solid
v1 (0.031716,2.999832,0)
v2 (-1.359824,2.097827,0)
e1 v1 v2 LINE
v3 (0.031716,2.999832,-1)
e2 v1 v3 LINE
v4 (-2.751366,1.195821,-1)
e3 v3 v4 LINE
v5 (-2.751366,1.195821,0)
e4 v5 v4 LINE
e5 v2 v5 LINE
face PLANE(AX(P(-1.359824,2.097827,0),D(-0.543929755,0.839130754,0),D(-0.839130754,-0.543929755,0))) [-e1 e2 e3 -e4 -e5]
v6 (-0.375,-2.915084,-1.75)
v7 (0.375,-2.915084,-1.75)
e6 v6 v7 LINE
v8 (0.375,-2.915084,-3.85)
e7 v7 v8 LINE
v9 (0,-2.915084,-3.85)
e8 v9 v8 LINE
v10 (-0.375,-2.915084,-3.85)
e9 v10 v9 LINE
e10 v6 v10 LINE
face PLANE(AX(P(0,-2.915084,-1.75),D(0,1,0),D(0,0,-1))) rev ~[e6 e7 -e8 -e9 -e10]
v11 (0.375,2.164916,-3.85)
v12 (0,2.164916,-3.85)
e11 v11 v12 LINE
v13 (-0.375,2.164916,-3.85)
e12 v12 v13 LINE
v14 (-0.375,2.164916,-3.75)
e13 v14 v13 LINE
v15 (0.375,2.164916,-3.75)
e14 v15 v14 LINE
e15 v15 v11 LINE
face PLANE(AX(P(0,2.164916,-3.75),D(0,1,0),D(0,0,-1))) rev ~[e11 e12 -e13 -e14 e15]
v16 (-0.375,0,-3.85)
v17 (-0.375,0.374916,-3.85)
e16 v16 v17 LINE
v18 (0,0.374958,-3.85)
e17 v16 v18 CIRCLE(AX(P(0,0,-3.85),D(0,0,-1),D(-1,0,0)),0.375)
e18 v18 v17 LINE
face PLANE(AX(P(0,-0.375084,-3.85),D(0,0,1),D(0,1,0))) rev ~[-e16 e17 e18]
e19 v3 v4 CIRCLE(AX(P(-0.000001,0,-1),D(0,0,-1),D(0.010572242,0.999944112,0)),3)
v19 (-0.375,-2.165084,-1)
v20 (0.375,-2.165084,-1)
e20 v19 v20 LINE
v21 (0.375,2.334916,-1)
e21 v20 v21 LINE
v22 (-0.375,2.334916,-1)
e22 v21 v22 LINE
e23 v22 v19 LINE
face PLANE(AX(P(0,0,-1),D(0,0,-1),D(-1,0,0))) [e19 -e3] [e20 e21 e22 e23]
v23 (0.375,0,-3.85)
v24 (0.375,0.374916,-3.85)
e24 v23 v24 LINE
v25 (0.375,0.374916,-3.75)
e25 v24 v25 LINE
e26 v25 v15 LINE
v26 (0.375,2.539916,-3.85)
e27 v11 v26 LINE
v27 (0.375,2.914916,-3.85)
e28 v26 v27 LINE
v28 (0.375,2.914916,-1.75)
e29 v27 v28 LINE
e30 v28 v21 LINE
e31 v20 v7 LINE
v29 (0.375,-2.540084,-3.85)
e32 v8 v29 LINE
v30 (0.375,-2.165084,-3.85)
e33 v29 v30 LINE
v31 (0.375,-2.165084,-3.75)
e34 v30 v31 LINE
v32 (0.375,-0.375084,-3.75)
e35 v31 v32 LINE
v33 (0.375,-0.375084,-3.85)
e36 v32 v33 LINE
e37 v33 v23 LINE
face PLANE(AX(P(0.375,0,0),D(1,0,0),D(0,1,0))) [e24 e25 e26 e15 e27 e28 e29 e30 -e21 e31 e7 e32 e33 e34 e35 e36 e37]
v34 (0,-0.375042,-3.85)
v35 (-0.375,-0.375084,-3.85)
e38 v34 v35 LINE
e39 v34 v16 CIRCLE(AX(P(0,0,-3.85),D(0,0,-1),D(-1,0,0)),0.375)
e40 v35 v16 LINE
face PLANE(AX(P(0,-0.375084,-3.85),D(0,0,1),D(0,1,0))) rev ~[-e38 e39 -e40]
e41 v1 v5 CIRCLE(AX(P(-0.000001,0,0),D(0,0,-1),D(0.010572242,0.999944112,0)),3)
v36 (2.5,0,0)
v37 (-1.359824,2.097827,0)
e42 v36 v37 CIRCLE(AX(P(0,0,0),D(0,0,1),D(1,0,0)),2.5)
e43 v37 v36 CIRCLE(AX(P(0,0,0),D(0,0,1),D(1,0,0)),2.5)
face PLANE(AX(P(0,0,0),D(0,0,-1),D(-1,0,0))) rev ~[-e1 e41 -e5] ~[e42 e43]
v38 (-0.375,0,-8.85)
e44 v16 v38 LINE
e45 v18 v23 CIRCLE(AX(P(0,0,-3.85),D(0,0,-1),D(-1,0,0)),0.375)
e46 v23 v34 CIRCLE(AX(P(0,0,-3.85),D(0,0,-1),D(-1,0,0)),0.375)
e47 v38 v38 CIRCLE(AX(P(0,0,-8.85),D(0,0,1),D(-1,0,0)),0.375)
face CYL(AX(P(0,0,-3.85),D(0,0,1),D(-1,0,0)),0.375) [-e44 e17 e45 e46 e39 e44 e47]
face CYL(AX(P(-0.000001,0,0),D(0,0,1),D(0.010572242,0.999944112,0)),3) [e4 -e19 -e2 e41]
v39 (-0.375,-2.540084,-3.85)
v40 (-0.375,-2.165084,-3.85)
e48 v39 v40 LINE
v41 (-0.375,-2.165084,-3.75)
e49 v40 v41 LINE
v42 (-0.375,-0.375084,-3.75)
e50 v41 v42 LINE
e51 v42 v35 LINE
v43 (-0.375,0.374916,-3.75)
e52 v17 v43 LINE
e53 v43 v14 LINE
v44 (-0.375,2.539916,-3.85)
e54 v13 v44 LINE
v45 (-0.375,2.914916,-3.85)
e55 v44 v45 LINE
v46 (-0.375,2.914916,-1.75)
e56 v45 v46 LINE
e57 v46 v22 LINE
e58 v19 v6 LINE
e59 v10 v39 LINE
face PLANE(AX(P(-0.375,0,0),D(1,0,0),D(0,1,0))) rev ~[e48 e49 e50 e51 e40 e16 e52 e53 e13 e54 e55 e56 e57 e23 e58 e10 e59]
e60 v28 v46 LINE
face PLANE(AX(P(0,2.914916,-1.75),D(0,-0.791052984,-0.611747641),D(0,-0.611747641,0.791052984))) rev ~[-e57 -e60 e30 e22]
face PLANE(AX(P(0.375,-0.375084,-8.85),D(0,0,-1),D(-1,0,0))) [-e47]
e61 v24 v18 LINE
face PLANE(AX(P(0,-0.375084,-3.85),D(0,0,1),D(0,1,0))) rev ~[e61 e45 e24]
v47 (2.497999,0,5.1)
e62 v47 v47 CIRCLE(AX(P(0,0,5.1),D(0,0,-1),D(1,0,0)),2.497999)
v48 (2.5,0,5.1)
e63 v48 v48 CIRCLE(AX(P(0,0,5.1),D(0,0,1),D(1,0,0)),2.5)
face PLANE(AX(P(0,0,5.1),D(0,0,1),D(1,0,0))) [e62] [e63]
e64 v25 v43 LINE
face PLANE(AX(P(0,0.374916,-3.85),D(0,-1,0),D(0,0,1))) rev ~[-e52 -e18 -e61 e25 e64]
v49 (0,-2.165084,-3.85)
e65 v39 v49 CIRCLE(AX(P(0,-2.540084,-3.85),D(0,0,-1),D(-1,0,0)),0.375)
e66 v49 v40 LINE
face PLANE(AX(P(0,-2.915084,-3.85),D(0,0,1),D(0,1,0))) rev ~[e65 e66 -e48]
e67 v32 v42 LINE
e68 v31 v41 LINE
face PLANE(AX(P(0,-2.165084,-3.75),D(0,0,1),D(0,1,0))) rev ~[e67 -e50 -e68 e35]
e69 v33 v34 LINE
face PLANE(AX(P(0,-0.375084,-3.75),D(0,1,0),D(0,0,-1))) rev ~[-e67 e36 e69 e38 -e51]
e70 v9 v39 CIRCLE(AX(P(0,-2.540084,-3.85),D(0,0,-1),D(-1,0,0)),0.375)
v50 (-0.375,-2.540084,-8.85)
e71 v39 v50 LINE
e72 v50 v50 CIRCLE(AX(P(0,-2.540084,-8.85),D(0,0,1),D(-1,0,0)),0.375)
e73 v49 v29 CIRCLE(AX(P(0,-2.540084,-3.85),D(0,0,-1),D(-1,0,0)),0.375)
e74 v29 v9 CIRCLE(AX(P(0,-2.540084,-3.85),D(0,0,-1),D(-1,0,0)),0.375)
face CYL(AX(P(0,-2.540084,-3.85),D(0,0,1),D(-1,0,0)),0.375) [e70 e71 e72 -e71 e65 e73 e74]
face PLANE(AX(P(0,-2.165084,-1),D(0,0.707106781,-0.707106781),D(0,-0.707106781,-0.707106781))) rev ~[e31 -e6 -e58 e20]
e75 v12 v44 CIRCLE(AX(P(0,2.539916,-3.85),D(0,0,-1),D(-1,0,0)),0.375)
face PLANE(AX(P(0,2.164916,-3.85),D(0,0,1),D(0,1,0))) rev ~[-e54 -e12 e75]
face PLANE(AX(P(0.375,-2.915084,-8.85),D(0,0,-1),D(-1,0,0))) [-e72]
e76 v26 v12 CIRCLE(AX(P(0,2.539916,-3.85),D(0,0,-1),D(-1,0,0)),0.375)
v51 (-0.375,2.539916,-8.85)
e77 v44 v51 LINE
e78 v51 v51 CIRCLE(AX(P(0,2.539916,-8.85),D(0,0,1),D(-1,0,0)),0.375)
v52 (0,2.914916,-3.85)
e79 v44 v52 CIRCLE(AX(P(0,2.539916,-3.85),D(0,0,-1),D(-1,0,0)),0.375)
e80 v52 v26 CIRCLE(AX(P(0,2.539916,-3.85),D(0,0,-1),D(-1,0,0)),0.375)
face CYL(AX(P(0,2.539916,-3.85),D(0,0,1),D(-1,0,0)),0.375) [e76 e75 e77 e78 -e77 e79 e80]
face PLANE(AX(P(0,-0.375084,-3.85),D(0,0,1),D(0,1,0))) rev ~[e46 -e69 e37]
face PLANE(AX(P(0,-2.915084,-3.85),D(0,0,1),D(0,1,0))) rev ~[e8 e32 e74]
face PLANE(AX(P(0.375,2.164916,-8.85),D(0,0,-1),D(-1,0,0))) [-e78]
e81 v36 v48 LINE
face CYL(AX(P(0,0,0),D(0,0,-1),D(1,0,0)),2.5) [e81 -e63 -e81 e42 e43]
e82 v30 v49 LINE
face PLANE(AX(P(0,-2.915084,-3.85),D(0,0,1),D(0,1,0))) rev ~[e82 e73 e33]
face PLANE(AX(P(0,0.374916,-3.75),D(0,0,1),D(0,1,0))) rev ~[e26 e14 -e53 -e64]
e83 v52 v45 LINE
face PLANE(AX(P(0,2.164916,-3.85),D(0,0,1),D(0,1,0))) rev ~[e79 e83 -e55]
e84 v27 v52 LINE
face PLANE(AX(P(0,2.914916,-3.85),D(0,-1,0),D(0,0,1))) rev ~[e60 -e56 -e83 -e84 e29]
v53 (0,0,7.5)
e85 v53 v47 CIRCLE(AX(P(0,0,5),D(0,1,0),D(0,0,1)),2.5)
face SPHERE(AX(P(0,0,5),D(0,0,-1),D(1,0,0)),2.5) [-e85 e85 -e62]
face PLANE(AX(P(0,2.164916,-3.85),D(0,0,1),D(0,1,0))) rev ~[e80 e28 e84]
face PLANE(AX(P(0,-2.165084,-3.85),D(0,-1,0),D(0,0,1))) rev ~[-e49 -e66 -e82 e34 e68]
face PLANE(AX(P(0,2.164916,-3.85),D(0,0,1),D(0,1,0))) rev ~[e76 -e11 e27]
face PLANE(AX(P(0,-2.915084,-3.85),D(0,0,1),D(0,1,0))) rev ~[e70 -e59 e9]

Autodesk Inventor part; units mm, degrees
ref_plane "YZ Plane" through (0, 0, 0) normal (1, 0, 0) x (0, 1, 0)
ref_plane "XZ Plane" through (0, 0, 0) normal (0, 1, 0) x (-1, 0, 0)
ref_plane "XY Plane" through (0, 0, 0) normal (0, 0, 1) x (1, 0, 0)
sketch "Sketch1" plane through (0, 0, 0) normal (0, 0, 1) x (1, 0, 0)
  circle A0 centre (0, 0) radius 2.5
  dimension "d0" = 5
extrude "Extrusion1" add sketch "Sketch1" along normal blind 5.1
sketch "Sketch2" plane through (0, 0, 0) normal (0, 0, -1) x (-1, 0, 0)
  circle A0 centre (0, 0) radius 2.5
  arc A1 (-0.031716, 2.999832) -> (2.751366, 1.195821) centre (0, 0) ccw
  line L0 (-0.031716, 2.999832) -> (2.751366, 1.195821)
  dimension "d3" = 6
extrude "Extrusion2" add sketch "Sketch2" along normal blind 1 contours A0 | L0 A1
sketch "Sketch4" plane through (0, 0, 0) normal (0, 1, 0) x (-1, 0, 0)
  line L0 (0, 0) -> (0, 10.583317)
  arc A0 (0, 7.5) -> (-2.5, 5) centre (0, 5) ccw
  line L1 (-2.5, 5) -> (0, 5)
  dimension "d11" = 2.5
  dimension "d12" = 5
revolve "Revolution1" add sketch "Sketch4" angle 360 about axis through (0, 0, 0) along (0, 0, 1)
sketch "Sketch5" plane through (0, 0, 0) normal (1, 0, 0) x (0, 1, 0)
  line L0 (-2.165084, -1) -> (-2.915084, -1.75)
  line L1 (-2.915084, -1.75) -> (-2.915084, -3.85)
  line L2 (-2.915084, -3.85) -> (-2.165084, -3.85)
  line L3 (-2.165084, -3.85) -> (-2.165084, -3.75)
  line L4 (-2.165084, -3.75) -> (-0.375084, -3.75)
  line L5 (-0.375084, -3.75) -> (-0.375084, -3.85)
  line L6 (-0.375084, -3.85) -> (0.374916, -3.85)
  line L7 (0.374916, -3.85) -> (0.374916, -3.75)
  line L8 (0.374916, -3.75) -> (2.164916, -3.75)
  line L9 (2.164916, -3.75) -> (2.164916, -3.85)
  line L10 (2.164916, -3.85) -> (2.914916, -3.85)
  line L11 (2.914916, -3.85) -> (2.914916, -1.75)
  line L12 (2.914916, -1.75) -> (2.334916, -1)
  line L13 (2.334916, -1) -> (-2.165084, -1)
  line L14 (2.999832, -1) -> (-3, -1)
  line L15 (-0.000084, -1) -> (-0.000084, -3.532862)
  point P0 (0, 0)
  point P1 (1.195821, -1)
  dimension "d14" = 0.75
  dimension "d15" = 0.75
  dimension "d16" = 0.75
  dimension "d17" = 2.54
  dimension "d18" = 2.54
  dimension "d19" = 2.75
  dimension "d20" = 4.5
  dimension "d21" = 0.75
  dimension "d22" = 0.75
  dimension "d23" = 0.1
  dimension "d24" = 0
  dimension "d25" = 0.375
extrude "Extrusion3" add sketch "Sketch5" along normal mid plane 0.75
sketch "Sketch6" plane through (0.375, -0.375084, -3.85) normal (0, 0, -1) x (-1, 0, 0)
  line L0 (0, 0) -> (0.75, 0.75)
  line L1 (0.75, 0) -> (0, 0.75)
  circle A0 centre (0.375, 0.375084) radius 0.375
  point P0 (0.375, 0.375084)
sketch "Sketch7" plane through (0.375, 2.164916, -3.85) normal (0, 0, -1) x (-1, 0, 0)
  line L0 (0, 0.75) -> (0.75, 0)
  line L1 (0.75, 0.75) -> (0, 0)
  circle A0 centre (0.375, 0.375) radius 0.375
  point P0 (0.375, -2.164916)
sketch "Sketch8" plane through (0.375, -2.915084, -3.85) normal (0, 0, -1) x (-1, 0, 0)
  line L0 (0, 0.75) -> (0.75, 0)
  line L1 (0.75, 0.75) -> (0, 0)
  circle A0 centre (0.375, 0.375) radius 0.375
  point P0 (0.375, 2.915084)
extrude "Extrusion4" add sketch "Sketch8" along normal blind 5
extrude "Extrusion5" add sketch "Sketch6" along normal blind 5
extrude "Extrusion6" add sketch "Sketch7" along normal blind 5
properties part number "LED"
